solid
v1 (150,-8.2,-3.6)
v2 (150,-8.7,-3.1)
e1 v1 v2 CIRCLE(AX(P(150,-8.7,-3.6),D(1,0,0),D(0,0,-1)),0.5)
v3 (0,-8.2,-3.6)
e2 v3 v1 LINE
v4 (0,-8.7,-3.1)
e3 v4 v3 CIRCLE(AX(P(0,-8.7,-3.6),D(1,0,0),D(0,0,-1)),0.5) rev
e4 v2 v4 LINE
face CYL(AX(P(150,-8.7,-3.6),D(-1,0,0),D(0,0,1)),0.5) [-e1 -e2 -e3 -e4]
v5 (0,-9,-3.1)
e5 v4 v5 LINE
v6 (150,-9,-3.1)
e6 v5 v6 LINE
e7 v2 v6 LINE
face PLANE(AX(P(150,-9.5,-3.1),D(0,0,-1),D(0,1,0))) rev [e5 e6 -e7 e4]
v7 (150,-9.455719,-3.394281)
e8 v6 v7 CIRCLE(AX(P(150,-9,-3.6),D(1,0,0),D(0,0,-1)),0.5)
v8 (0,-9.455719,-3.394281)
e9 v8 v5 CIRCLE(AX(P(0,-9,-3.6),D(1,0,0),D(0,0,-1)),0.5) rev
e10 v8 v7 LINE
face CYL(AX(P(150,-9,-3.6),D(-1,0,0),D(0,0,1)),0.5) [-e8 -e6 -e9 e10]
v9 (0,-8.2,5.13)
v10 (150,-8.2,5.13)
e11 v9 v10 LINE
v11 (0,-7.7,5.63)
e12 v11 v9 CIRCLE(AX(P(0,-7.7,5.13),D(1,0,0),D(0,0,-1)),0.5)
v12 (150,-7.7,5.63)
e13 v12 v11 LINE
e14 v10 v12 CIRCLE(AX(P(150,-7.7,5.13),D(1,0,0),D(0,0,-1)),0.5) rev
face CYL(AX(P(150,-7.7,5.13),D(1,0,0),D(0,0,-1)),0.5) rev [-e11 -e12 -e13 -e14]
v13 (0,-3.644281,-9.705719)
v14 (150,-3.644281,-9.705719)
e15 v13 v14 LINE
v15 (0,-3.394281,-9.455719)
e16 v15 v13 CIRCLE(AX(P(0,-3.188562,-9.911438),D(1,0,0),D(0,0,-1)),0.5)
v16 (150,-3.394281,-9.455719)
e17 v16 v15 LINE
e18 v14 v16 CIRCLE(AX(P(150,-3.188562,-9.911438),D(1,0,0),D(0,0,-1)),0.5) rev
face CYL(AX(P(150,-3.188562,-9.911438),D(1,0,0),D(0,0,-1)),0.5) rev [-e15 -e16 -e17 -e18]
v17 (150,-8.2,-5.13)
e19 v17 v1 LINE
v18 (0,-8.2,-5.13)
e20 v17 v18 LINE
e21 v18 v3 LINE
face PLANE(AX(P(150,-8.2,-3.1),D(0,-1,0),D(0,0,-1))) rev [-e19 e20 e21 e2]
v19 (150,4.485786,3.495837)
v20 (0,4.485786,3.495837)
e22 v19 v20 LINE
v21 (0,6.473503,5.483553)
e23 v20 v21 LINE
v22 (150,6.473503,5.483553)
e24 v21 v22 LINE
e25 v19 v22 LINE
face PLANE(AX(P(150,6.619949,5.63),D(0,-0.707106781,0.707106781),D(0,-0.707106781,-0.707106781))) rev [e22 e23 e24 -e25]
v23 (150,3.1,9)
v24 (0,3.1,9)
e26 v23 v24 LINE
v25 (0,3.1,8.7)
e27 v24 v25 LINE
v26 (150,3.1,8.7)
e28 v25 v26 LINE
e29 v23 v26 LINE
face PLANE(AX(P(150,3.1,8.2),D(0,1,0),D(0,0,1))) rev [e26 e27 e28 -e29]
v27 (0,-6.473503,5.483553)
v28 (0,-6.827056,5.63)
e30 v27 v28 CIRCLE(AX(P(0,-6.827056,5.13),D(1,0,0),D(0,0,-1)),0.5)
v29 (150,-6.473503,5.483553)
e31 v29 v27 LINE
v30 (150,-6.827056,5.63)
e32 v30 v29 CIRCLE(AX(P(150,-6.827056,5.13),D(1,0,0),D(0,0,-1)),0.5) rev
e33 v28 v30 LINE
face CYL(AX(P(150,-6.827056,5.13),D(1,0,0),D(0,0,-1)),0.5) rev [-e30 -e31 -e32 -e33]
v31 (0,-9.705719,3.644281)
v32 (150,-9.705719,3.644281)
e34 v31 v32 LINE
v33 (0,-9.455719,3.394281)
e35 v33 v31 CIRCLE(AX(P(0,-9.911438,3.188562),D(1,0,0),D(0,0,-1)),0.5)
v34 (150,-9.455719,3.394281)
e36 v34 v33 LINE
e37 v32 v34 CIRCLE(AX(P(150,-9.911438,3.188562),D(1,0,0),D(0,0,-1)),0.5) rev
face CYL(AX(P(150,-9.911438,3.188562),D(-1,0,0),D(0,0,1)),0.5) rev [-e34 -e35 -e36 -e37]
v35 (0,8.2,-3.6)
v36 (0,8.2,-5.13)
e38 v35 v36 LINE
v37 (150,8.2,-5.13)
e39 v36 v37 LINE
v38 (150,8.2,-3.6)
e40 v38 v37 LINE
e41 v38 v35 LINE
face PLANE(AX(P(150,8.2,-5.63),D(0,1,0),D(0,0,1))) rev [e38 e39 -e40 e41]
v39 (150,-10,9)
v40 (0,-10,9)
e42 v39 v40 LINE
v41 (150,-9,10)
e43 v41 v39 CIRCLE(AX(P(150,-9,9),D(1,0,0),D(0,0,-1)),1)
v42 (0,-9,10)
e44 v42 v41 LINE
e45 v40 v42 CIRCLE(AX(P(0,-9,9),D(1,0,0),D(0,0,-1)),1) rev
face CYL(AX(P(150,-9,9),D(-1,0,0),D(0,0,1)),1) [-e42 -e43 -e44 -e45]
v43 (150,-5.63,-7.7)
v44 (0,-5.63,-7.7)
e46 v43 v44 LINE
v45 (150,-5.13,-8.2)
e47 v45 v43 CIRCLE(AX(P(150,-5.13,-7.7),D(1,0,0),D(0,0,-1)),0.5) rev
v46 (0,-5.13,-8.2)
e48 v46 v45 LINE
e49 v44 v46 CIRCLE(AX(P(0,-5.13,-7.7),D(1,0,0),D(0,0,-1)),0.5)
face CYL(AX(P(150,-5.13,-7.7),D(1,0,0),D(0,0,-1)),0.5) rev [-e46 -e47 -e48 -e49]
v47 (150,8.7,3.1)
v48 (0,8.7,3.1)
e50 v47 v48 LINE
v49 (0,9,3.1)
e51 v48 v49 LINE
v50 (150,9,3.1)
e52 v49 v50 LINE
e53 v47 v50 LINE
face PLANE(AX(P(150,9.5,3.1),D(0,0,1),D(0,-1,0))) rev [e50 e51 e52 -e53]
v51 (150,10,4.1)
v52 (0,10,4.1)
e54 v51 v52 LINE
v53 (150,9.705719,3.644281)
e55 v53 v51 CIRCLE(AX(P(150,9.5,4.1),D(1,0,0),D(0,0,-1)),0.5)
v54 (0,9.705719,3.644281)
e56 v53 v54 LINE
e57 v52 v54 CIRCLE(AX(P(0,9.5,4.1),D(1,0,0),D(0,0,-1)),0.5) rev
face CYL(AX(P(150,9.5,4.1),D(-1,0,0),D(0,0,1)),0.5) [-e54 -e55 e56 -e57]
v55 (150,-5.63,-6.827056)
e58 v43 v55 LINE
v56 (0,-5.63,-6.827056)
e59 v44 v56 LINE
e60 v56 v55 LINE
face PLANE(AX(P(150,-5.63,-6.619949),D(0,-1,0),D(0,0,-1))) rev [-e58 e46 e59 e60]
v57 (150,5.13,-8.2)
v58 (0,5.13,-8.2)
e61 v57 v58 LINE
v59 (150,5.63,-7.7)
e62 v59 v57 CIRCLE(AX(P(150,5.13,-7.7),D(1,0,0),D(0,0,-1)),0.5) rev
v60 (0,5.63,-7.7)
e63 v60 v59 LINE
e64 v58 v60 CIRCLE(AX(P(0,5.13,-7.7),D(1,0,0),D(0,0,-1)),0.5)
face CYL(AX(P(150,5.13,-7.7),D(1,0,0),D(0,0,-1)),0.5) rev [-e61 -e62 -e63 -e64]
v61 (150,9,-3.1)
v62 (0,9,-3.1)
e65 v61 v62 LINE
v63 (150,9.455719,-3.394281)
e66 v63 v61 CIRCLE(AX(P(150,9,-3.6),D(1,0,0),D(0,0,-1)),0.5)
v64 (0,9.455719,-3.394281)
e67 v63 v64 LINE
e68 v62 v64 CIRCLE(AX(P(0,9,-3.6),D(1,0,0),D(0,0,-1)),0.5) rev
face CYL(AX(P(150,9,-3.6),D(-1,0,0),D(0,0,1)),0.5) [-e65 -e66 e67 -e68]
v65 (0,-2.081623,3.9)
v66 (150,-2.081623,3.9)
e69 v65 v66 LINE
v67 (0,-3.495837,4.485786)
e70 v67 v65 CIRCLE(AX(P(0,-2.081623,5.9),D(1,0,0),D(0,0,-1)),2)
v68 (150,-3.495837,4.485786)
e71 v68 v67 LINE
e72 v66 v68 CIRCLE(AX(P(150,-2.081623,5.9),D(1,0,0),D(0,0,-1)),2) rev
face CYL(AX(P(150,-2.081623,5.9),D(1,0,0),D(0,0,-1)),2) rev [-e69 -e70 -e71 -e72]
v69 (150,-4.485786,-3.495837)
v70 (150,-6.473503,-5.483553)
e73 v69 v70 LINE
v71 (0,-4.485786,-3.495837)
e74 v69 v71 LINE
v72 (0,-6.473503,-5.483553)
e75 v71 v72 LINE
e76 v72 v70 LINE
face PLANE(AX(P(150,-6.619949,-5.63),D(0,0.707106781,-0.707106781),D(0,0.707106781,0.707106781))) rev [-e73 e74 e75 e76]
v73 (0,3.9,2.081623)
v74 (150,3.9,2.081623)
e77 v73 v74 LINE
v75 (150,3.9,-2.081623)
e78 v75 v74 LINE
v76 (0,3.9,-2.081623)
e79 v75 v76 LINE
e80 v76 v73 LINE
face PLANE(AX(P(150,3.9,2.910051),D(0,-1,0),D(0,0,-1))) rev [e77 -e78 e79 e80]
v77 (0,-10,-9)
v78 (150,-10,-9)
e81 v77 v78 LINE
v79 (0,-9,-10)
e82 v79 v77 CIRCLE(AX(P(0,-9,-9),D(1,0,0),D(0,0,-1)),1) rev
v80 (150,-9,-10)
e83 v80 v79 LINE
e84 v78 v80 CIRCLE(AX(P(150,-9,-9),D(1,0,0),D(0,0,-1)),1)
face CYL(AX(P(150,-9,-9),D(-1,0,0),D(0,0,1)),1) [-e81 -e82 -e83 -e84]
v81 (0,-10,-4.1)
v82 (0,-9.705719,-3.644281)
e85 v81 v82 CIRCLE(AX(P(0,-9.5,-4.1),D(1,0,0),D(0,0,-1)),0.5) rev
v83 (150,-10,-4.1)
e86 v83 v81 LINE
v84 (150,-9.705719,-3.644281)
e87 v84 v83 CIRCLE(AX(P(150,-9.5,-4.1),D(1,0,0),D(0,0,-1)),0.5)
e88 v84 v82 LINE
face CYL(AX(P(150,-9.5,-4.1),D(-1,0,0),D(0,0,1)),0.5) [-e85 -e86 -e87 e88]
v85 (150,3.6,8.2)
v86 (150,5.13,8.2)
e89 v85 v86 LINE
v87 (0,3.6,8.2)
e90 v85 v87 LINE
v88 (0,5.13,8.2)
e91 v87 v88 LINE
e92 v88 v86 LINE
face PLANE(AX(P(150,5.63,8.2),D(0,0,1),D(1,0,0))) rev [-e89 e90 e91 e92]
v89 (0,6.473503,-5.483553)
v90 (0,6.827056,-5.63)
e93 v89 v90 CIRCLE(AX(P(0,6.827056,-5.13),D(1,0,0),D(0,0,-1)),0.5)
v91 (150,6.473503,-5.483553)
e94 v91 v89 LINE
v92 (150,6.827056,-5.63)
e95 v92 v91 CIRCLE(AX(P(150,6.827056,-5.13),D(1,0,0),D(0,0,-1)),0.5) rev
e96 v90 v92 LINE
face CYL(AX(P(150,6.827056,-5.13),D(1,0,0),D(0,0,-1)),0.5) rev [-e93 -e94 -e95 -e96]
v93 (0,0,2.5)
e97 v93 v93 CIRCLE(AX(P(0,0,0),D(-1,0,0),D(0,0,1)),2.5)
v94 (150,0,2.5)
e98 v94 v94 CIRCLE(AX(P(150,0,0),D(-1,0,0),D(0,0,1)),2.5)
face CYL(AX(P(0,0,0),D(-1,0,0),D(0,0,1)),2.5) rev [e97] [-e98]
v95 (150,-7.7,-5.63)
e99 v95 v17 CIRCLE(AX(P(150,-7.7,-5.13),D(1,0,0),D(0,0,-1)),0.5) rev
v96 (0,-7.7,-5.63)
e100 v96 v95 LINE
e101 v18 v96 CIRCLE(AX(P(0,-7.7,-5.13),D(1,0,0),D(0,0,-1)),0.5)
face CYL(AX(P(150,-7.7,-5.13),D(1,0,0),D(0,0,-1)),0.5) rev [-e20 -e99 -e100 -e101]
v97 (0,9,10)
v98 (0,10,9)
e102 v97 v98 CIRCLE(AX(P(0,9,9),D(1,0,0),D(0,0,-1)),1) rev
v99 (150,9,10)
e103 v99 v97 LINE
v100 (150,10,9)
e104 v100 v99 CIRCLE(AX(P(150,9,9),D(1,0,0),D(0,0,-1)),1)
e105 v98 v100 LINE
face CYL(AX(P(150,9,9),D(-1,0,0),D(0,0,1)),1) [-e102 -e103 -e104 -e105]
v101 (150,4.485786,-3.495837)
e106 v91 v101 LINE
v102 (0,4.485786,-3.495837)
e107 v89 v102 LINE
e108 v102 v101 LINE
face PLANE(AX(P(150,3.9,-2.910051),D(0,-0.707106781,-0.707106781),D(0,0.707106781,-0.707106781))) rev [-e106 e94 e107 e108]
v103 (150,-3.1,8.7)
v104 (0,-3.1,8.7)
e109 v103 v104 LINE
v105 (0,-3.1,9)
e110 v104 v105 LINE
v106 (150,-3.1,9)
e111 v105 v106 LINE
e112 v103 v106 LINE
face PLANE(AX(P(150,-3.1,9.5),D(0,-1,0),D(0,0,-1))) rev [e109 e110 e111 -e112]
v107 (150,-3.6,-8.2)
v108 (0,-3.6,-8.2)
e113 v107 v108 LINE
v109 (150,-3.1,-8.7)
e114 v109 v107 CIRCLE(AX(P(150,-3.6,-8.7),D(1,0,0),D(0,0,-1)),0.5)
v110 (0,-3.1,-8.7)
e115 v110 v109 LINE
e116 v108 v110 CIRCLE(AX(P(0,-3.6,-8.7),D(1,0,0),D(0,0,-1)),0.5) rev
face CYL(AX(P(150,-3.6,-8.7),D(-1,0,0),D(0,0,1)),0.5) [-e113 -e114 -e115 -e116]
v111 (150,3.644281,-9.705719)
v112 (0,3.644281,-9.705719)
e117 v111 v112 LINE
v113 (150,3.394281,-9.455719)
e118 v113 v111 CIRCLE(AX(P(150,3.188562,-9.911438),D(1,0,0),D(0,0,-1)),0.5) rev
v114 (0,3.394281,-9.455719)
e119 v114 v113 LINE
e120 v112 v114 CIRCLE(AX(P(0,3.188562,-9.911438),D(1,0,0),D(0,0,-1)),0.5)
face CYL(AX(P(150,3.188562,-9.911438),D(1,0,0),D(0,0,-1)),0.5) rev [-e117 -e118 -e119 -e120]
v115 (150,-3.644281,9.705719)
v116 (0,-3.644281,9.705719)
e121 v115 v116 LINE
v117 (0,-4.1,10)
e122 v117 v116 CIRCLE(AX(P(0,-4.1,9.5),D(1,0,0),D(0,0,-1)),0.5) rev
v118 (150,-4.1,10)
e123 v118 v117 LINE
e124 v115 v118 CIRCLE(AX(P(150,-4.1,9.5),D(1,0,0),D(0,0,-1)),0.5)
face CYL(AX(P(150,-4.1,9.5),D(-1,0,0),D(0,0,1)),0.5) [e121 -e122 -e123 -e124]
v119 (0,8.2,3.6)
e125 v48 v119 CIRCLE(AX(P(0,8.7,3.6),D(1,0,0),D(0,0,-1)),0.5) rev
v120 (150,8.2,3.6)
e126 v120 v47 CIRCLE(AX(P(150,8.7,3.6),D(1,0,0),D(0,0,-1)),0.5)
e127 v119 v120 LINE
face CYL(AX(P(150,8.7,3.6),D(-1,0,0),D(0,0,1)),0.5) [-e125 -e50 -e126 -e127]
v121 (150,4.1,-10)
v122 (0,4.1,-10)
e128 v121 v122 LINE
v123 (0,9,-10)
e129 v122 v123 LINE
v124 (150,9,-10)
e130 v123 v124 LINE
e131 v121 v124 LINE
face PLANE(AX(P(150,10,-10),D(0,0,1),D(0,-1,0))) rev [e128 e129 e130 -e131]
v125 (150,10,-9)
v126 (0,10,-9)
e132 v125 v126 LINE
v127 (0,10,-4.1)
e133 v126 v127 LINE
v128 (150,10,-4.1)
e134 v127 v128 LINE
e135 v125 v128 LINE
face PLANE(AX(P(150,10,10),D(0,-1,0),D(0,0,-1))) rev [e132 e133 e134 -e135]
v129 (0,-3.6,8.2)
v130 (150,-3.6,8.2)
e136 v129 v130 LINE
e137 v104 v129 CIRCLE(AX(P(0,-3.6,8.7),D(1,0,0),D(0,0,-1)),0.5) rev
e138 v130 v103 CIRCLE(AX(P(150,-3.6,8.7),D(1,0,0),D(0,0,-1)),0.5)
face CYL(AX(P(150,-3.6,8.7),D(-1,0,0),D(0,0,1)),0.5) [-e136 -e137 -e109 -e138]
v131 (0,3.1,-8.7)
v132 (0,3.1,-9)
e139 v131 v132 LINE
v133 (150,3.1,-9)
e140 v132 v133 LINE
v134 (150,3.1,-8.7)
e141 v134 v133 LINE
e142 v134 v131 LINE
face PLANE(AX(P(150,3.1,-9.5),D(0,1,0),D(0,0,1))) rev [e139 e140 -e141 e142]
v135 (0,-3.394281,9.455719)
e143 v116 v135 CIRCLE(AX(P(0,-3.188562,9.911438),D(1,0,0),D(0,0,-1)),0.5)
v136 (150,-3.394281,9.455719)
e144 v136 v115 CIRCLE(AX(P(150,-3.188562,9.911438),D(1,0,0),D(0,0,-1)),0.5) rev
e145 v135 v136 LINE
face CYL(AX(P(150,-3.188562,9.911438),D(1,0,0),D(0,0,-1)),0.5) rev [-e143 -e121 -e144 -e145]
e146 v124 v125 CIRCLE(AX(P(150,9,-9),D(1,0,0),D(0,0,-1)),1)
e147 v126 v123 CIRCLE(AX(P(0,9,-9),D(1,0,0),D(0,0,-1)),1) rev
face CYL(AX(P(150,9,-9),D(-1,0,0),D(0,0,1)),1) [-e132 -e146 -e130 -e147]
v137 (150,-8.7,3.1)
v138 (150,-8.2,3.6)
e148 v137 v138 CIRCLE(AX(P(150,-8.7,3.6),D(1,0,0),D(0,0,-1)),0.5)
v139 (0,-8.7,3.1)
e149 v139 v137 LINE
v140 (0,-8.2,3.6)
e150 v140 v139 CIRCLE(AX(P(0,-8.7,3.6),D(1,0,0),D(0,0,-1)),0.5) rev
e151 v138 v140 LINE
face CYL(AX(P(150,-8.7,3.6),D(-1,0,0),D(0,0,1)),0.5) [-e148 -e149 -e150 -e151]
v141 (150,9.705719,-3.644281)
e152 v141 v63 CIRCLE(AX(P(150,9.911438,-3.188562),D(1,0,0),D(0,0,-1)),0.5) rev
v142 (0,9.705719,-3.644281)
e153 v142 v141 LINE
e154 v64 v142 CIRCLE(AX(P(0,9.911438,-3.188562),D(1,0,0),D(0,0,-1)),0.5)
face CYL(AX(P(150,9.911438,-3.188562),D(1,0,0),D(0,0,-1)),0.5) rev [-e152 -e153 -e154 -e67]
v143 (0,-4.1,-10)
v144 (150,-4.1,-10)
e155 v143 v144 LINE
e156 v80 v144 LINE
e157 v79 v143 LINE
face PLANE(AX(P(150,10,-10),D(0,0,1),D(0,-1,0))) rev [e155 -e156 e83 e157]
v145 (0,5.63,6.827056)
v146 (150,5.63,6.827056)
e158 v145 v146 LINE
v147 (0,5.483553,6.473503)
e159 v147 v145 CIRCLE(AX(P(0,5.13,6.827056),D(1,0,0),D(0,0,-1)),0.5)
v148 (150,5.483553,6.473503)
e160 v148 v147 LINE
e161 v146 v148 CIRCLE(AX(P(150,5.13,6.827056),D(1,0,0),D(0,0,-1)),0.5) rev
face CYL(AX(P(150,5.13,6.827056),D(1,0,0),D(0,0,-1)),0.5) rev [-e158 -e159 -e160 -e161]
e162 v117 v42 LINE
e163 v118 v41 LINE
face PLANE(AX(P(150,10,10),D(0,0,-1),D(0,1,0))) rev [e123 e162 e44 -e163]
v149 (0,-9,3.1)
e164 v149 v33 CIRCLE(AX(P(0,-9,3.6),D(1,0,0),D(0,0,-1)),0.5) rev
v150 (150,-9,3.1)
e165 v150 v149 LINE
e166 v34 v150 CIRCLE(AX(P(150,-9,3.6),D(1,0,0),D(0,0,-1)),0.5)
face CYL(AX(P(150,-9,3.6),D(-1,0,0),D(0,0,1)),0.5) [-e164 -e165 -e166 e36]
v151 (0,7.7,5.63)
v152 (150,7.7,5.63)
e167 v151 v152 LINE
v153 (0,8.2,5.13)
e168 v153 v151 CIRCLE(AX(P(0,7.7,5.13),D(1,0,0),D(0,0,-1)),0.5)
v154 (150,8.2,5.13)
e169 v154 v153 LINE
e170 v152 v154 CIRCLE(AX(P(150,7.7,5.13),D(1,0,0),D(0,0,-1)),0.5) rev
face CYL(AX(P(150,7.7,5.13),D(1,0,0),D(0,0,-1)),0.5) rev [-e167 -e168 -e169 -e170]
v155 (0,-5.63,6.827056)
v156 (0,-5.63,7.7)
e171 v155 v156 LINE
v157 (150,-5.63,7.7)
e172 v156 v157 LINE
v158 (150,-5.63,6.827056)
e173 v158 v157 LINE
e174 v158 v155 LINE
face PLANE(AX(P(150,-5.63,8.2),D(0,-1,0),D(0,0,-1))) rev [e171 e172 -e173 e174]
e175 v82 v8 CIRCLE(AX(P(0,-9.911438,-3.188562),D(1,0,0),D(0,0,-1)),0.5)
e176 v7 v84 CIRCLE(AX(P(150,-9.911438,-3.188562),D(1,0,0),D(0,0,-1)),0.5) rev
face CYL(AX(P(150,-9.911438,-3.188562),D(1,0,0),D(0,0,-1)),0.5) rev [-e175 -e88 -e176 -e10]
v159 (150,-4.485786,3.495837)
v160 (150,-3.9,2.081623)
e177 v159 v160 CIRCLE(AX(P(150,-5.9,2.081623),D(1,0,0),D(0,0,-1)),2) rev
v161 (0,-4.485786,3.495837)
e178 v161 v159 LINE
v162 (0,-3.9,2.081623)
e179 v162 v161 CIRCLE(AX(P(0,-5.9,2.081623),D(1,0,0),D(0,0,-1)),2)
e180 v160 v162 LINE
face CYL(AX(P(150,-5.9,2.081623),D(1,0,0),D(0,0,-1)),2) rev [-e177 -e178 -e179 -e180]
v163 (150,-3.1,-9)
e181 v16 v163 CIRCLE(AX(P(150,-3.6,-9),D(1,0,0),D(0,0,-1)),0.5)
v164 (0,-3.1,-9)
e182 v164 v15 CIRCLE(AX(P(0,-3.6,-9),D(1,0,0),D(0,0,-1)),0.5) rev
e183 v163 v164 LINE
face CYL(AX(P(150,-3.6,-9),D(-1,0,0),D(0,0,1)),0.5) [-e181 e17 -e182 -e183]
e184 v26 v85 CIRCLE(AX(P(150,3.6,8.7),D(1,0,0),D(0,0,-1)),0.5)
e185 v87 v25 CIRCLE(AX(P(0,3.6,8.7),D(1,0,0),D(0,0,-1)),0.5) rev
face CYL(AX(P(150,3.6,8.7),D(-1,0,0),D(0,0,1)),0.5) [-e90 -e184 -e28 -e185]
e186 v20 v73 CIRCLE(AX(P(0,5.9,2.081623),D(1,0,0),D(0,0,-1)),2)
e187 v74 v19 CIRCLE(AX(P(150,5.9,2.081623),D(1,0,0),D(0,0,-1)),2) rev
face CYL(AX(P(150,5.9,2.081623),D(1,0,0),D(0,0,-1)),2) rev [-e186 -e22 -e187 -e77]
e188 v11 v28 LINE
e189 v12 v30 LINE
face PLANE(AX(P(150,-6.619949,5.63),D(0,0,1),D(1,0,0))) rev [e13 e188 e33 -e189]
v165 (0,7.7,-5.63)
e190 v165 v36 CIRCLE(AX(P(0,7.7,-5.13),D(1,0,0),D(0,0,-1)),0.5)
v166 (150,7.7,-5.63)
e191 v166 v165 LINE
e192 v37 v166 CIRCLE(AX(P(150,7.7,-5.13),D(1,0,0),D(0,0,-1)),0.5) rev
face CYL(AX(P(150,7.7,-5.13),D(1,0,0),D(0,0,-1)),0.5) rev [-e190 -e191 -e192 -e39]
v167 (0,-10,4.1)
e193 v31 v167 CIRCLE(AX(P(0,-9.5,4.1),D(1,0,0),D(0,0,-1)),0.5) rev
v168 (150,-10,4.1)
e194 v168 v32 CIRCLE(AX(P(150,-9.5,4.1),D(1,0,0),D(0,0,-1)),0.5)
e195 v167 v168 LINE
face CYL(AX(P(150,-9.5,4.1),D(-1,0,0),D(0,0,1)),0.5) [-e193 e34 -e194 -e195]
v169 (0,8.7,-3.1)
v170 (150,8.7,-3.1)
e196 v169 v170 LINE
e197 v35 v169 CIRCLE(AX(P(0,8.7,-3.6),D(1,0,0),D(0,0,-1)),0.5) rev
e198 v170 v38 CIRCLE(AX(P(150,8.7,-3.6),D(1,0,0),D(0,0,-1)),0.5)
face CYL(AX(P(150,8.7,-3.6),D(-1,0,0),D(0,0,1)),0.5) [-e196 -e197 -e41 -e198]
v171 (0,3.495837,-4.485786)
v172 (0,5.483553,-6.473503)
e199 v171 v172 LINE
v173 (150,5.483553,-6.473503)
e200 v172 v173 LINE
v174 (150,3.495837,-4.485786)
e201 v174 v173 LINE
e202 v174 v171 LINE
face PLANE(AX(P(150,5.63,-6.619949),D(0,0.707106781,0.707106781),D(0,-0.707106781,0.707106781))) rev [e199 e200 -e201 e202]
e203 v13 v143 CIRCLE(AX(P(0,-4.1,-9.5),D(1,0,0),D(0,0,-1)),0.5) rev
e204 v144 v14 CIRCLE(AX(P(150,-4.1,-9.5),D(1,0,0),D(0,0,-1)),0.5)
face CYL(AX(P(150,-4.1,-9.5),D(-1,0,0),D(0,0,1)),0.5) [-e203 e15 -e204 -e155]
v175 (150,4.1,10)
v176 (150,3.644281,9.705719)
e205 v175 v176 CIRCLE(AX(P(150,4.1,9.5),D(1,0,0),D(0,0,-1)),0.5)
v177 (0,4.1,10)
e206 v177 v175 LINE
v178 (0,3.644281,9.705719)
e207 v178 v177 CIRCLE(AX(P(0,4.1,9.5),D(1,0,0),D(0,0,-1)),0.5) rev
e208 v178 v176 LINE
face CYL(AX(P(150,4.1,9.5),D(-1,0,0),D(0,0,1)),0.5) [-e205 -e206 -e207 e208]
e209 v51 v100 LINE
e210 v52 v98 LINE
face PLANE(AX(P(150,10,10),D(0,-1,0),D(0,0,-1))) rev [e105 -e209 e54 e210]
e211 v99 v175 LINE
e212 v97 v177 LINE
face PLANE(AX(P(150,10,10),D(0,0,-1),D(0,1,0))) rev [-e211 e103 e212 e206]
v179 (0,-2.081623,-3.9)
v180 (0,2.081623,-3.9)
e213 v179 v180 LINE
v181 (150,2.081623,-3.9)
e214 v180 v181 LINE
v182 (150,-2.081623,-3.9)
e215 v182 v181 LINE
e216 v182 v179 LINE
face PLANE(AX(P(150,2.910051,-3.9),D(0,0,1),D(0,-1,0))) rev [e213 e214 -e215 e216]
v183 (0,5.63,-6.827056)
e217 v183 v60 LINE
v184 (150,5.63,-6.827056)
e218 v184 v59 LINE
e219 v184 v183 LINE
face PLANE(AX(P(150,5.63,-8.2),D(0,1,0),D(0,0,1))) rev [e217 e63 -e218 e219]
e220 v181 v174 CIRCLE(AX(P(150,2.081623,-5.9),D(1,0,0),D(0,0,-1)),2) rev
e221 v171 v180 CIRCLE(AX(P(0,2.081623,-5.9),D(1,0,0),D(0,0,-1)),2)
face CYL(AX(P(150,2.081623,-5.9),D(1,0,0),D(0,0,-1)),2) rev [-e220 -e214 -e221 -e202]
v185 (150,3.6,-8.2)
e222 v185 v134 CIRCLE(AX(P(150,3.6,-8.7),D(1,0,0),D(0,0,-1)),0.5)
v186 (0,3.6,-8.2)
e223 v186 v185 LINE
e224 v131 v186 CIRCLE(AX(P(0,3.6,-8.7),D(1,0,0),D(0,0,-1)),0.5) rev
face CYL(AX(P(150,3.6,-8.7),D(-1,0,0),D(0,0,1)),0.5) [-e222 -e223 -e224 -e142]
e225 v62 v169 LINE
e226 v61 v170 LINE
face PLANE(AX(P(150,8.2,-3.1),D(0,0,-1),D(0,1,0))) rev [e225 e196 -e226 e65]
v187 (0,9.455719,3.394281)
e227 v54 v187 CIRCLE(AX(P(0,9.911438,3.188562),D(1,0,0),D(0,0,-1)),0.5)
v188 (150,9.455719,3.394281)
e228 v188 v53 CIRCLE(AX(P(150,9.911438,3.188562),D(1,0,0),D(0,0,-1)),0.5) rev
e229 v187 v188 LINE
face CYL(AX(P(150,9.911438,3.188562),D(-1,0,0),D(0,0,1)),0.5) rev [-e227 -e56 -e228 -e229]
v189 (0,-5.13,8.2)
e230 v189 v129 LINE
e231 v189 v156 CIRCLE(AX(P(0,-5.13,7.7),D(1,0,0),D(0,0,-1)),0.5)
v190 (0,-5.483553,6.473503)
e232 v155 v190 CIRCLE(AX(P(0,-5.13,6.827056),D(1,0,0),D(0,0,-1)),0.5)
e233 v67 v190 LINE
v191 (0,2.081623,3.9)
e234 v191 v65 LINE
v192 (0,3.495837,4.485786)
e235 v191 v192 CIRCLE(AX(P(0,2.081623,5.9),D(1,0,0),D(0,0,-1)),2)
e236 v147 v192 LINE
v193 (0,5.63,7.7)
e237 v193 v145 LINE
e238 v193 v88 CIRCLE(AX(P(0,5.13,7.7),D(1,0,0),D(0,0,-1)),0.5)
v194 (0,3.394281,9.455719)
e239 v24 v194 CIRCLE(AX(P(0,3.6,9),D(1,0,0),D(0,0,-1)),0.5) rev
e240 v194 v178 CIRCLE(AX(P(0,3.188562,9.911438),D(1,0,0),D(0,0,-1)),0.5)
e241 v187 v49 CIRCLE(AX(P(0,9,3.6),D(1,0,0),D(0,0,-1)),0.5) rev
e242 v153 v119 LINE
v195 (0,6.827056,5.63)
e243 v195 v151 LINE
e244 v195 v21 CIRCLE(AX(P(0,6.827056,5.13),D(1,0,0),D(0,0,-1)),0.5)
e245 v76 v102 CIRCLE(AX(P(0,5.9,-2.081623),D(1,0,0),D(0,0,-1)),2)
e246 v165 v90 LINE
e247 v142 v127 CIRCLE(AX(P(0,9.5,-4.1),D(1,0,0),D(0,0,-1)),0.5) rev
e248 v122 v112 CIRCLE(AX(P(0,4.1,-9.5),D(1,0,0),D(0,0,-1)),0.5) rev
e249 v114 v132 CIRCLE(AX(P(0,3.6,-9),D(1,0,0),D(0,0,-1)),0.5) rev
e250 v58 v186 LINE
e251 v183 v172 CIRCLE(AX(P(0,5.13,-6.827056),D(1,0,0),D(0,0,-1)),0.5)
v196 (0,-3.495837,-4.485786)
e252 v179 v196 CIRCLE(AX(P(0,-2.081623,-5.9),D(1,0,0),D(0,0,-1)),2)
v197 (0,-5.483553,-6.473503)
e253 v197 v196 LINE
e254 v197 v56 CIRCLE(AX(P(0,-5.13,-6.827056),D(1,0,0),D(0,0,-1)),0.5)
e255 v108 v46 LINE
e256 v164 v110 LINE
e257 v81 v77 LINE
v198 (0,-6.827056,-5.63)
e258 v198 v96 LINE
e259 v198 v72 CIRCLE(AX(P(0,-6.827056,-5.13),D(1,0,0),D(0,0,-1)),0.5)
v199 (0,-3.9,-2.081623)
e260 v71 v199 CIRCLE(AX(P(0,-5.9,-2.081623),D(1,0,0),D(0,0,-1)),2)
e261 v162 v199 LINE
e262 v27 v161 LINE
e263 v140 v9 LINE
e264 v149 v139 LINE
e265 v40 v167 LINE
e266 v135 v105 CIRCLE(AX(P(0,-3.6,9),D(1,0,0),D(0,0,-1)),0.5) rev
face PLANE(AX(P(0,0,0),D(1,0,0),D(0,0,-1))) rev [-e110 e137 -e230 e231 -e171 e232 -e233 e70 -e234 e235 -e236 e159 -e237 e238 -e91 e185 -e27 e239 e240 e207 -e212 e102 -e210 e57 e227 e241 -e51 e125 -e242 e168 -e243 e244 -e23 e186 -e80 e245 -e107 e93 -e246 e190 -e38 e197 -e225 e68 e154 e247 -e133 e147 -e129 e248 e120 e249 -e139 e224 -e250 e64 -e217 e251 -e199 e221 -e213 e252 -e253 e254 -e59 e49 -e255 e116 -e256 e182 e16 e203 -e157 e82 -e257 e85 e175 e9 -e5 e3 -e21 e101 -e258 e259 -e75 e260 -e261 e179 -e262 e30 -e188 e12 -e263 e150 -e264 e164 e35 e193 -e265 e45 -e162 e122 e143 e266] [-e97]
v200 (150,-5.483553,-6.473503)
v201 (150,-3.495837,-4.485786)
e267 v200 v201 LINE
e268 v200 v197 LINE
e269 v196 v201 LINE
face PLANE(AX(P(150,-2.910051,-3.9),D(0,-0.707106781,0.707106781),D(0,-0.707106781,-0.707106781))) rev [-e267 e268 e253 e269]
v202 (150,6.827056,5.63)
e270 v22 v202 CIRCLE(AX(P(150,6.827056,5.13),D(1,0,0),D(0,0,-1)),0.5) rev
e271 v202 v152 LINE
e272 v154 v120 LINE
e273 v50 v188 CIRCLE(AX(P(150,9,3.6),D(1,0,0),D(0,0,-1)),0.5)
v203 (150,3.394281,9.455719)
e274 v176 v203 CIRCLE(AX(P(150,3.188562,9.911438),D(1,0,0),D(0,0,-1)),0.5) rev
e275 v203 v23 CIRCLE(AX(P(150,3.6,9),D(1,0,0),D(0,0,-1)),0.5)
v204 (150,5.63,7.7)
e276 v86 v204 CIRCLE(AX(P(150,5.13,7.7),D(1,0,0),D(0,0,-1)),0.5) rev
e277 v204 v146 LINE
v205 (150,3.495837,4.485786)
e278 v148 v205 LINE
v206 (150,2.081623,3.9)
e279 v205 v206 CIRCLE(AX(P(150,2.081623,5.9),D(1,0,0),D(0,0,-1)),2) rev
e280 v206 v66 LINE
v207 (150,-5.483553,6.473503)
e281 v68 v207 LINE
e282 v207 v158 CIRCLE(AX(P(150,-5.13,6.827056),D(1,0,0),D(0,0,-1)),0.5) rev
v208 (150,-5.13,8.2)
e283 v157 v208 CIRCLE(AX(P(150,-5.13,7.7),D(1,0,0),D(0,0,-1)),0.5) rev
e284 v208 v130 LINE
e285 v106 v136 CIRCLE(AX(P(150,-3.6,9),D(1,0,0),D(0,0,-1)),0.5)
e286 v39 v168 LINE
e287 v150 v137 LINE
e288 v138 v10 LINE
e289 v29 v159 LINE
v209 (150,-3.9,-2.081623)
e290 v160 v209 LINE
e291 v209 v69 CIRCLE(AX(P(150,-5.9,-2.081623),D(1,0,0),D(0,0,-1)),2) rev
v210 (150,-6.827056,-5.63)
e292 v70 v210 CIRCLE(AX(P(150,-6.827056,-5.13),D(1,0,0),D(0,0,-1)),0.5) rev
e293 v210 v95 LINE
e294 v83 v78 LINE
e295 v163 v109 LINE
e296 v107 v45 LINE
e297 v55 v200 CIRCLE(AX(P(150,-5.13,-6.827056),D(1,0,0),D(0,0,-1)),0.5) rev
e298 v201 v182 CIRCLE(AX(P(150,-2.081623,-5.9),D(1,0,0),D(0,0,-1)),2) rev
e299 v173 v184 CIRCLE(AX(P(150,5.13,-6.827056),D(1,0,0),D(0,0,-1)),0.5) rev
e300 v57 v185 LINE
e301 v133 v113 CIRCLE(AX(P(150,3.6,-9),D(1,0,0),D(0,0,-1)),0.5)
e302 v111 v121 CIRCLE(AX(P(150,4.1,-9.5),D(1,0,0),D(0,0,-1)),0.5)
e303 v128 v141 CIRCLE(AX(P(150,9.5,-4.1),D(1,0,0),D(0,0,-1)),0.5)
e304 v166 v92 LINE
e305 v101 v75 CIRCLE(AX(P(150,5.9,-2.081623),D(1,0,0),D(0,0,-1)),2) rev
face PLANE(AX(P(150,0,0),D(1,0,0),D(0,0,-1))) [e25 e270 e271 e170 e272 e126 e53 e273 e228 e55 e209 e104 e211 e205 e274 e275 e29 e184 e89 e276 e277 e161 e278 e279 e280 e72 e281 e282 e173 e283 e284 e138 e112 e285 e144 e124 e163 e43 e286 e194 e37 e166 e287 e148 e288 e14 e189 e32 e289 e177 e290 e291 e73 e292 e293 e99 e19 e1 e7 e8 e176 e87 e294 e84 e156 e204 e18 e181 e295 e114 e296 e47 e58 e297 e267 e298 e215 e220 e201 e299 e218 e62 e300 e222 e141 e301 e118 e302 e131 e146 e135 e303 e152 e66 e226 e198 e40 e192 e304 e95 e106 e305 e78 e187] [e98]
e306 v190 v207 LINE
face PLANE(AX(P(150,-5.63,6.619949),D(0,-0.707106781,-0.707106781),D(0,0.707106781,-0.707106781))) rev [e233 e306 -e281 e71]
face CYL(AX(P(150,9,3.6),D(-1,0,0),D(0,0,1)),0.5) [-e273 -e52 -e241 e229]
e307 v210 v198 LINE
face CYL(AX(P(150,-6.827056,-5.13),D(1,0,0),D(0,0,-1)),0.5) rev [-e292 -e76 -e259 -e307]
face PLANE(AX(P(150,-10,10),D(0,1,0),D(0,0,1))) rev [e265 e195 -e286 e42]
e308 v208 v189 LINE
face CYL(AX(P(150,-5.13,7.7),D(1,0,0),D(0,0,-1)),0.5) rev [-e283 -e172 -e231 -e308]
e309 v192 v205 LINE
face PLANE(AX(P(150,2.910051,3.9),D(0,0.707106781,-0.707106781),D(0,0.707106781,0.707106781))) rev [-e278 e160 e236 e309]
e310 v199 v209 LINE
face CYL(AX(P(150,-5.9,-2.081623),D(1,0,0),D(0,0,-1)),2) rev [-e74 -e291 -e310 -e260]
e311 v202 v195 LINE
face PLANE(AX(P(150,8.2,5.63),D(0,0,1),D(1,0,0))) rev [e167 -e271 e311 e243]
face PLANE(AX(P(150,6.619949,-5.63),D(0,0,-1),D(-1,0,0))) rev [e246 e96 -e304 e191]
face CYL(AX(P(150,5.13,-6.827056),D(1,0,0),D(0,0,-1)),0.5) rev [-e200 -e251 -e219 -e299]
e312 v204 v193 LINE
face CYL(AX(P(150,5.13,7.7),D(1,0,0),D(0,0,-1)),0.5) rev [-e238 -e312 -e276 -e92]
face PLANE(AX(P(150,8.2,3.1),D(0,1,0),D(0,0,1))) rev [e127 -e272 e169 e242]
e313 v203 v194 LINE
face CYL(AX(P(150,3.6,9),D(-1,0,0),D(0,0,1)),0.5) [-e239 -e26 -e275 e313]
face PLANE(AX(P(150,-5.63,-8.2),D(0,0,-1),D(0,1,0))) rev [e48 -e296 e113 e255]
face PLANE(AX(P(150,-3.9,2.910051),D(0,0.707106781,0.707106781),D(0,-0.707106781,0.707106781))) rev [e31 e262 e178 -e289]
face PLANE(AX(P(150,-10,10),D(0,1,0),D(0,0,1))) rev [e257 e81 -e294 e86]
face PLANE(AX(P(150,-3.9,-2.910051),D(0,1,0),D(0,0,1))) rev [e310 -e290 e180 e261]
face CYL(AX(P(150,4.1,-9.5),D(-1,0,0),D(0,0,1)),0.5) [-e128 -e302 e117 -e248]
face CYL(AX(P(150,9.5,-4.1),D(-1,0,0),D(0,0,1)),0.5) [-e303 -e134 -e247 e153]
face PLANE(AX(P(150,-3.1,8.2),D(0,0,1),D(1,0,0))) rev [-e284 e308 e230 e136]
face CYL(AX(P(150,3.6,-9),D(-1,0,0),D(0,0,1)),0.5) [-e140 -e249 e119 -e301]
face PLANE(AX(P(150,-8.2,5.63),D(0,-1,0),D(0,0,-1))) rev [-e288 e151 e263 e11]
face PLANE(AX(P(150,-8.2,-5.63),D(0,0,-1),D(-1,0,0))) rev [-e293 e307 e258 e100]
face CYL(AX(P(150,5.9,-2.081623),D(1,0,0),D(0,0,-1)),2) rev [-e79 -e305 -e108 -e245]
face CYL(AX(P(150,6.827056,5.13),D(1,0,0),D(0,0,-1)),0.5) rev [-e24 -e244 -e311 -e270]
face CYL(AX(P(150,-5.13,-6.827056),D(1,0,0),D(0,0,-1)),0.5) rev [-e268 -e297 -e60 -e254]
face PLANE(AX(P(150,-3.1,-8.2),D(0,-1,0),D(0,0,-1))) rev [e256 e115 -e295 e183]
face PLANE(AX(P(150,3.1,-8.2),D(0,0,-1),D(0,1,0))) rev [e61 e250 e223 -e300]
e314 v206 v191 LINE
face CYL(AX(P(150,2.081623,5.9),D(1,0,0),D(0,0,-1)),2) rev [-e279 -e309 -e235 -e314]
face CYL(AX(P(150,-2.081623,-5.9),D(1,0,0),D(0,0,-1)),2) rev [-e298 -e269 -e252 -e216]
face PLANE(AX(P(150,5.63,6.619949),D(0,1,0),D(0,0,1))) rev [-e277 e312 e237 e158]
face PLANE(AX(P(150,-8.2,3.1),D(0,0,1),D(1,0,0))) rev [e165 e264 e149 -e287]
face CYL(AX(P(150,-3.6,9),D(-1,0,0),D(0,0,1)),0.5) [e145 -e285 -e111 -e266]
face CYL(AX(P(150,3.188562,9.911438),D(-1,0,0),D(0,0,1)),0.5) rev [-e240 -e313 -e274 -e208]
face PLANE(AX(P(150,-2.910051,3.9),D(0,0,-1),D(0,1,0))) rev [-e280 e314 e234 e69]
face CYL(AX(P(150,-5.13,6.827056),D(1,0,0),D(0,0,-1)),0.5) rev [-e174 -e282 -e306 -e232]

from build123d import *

# Parameters (mm, degrees)
SKETCH1_W                = 20
SKETCH1_H                = 20
BOSS_EXTRUDE1_DEPTH      = 150
FILLET1_R                = 1
CUT_EXTRUDE1_DEPTH       = 151.665191733
F_5_0_5_DIAMETER_HOLE1_D = 5
FILLET2_R                = 2
FILLET3_R                = 0.5
FILLET4_R                = 0.5
FILLET5_R                = 0.5


with BuildPart() as part:
    # Sketch1 → Boss-Extrude1 (new body)
    with BuildSketch(Plane(origin=(0, 0, 0), x_dir=(0, 0, -1), z_dir=(1, 0, 0))):
        Rectangle(SKETCH1_W, SKETCH1_H)
    extrude(amount=BOSS_EXTRUDE1_DEPTH)

    # Fillet1
    fillet1_edges = [part.edges().sort_by_distance(p)[0] for p in [
        (75, 10, 10),
        (75, 10, -10),
        (75, -10, -10),
        (75, -10, 10),
    ]]
    fillet(fillet1_edges, radius=FILLET1_R)

    # Sketch3 → Cut-Extrude1 (cut, through all)
    with BuildSketch(Plane.ZY):
        Polygon((-3.6, 10), (3.6, 10), (3.6, 9.5), (3.1, 9.5), (3.1, 8.2), (5.63, 8.2), (5.63, 6.619949494), (2.910050506, 3.9), (-2.910050506, 3.9), (-5.63, 6.619949494), (-5.63, 8.2), (-3.1, 8.2), (-3.1, 9.5), (-3.6, 9.5), align=None)
        Polygon((10, 3.6), (10, -3.6), (9.5, -3.6), (9.5, -3.1), (8.2, -3.1), (8.2, -5.63), (6.619949494, -5.63), (3.9, -2.910050506), (3.9, 2.910050506), (6.619949494, 5.63), (8.2, 5.63), (8.2, 3.1), (9.5, 3.1), (9.5, 3.6), align=None)
        Polygon((3.6, -10), (-3.6, -10), (-3.6, -9.5), (-3.1, -9.5), (-3.1, -8.2), (-5.63, -8.2), (-5.63, -6.619949494), (-2.910050506, -3.9), (2.910050506, -3.9), (5.63, -6.619949494), (5.63, -8.2), (3.1, -8.2), (3.1, -9.5), (3.6, -9.5), align=None)
        Polygon((-10, -3.6), (-10, 3.6), (-9.5, 3.6), (-9.5, 3.1), (-8.2, 3.1), (-8.2, 5.63), (-6.619949494, 5.63), (-3.9, 2.910050506), (-3.9, -2.910050506), (-6.619949494, -5.63), (-8.2, -5.63), (-8.2, -3.1), (-9.5, -3.1), (-9.5, -3.6), align=None)
    extrude(amount=-CUT_EXTRUDE1_DEPTH, mode=Mode.SUBTRACT)

    # Ø5.0 (5) Diameter Hole1 (through all)
    with Locations(Plane.ZY):
        with Locations((0, 0)):
            Hole(F_5_0_5_DIAMETER_HOLE1_D / 2)

    # Fillet2
    fillet2_edges = [part.edges().sort_by_distance(p)[0] for p in [
        (75, -3.9, -2.910050506),
        (75, -3.9, 2.910050506),
        (75, 2.910050506, -3.9),
        (75, -2.910050506, -3.9),
        (75, -2.910050506, 3.9),
        (75, 2.910050506, 3.9),
        (75, 3.9, 2.910050506),
        (75, 3.9, -2.910050506),
    ]]
    fillet(fillet2_edges, radius=FILLET2_R)

    # Fillet3
    fillet3_edges = [part.edges().sort_by_distance(p)[0] for p in [
        (75, 3.6, -10),
        (75, 3.1, -9.5),
        (75, 3.1, -8.2),
        (75, 5.63, -8.2),
        (75, 5.63, -6.619949494),
        (75, 3.6, 10),
        (75, 3.1, 9.5),
        (75, 3.1, 8.2),
        (75, 5.63, 8.2),
        (75, 5.63, 6.619949494),
        (75, 6.619949494, 5.63),
        (75, 8.2, 5.63),
        (75, 8.2, 3.1),
        (75, 9.5, 3.1),
        (75, 10, 3.6),
        (75, 9.5, -3.1),
        (75, 10, -3.6),
        (75, 8.2, -3.1),
        (75, 8.2, -5.63),
        (75, 6.619949494, -5.63),
    ]]
    fillet(fillet3_edges, radius=FILLET3_R - 0.0001)  # a hair under: the kernel refuses the full size

    # Fillet4
    fillet4_edges = [part.edges().sort_by_distance(p)[0] for p in [
        (75, -3.6, 10),
        (75, -3.1, 9.5),
        (75, -3.1, 8.2),
        (75, -5.63, 8.2),
        (75, -5.63, 6.619949494),
        (75, -6.619949494, 5.63),
        (75, -8.2, 5.63),
        (75, -8.2, 3.1),
        (75, -10, 3.6),
        (75, -9.5, 3.1),
        (75, -10, -3.6),
        (75, -9.5, -3.1),
        (75, -8.2, -3.1),
        (75, -8.2, -5.63),
        (75, -6.619949494, -5.63),
        (75, -5.63, -6.619949494),
        (75, -5.63, -8.2),
        (75, -3.1, -8.2),
        (75, -3.1, -9.5),
        (75, -3.6, -10),
    ]]
    fillet(fillet4_edges, radius=FILLET4_R - 0.0001)  # a hair under: the kernel refuses the full size

    # Fillet5
    fillet5_edges = [part.edges().sort_by_distance(p)[0] for p in [
        (75, 3.6, 9.5),
        (75, 9.5, 3.6),
        (75, 9.5, -3.6),
        (75, 3.6, -9.5),
        (75, -3.6, 9.5),
        (75, -9.5, 3.6),
        (75, -9.5, -3.6),
        (75, -3.6, -9.5),
    ]]
    fillet(fillet5_edges, radius=FILLET5_R)


solid = part.part
